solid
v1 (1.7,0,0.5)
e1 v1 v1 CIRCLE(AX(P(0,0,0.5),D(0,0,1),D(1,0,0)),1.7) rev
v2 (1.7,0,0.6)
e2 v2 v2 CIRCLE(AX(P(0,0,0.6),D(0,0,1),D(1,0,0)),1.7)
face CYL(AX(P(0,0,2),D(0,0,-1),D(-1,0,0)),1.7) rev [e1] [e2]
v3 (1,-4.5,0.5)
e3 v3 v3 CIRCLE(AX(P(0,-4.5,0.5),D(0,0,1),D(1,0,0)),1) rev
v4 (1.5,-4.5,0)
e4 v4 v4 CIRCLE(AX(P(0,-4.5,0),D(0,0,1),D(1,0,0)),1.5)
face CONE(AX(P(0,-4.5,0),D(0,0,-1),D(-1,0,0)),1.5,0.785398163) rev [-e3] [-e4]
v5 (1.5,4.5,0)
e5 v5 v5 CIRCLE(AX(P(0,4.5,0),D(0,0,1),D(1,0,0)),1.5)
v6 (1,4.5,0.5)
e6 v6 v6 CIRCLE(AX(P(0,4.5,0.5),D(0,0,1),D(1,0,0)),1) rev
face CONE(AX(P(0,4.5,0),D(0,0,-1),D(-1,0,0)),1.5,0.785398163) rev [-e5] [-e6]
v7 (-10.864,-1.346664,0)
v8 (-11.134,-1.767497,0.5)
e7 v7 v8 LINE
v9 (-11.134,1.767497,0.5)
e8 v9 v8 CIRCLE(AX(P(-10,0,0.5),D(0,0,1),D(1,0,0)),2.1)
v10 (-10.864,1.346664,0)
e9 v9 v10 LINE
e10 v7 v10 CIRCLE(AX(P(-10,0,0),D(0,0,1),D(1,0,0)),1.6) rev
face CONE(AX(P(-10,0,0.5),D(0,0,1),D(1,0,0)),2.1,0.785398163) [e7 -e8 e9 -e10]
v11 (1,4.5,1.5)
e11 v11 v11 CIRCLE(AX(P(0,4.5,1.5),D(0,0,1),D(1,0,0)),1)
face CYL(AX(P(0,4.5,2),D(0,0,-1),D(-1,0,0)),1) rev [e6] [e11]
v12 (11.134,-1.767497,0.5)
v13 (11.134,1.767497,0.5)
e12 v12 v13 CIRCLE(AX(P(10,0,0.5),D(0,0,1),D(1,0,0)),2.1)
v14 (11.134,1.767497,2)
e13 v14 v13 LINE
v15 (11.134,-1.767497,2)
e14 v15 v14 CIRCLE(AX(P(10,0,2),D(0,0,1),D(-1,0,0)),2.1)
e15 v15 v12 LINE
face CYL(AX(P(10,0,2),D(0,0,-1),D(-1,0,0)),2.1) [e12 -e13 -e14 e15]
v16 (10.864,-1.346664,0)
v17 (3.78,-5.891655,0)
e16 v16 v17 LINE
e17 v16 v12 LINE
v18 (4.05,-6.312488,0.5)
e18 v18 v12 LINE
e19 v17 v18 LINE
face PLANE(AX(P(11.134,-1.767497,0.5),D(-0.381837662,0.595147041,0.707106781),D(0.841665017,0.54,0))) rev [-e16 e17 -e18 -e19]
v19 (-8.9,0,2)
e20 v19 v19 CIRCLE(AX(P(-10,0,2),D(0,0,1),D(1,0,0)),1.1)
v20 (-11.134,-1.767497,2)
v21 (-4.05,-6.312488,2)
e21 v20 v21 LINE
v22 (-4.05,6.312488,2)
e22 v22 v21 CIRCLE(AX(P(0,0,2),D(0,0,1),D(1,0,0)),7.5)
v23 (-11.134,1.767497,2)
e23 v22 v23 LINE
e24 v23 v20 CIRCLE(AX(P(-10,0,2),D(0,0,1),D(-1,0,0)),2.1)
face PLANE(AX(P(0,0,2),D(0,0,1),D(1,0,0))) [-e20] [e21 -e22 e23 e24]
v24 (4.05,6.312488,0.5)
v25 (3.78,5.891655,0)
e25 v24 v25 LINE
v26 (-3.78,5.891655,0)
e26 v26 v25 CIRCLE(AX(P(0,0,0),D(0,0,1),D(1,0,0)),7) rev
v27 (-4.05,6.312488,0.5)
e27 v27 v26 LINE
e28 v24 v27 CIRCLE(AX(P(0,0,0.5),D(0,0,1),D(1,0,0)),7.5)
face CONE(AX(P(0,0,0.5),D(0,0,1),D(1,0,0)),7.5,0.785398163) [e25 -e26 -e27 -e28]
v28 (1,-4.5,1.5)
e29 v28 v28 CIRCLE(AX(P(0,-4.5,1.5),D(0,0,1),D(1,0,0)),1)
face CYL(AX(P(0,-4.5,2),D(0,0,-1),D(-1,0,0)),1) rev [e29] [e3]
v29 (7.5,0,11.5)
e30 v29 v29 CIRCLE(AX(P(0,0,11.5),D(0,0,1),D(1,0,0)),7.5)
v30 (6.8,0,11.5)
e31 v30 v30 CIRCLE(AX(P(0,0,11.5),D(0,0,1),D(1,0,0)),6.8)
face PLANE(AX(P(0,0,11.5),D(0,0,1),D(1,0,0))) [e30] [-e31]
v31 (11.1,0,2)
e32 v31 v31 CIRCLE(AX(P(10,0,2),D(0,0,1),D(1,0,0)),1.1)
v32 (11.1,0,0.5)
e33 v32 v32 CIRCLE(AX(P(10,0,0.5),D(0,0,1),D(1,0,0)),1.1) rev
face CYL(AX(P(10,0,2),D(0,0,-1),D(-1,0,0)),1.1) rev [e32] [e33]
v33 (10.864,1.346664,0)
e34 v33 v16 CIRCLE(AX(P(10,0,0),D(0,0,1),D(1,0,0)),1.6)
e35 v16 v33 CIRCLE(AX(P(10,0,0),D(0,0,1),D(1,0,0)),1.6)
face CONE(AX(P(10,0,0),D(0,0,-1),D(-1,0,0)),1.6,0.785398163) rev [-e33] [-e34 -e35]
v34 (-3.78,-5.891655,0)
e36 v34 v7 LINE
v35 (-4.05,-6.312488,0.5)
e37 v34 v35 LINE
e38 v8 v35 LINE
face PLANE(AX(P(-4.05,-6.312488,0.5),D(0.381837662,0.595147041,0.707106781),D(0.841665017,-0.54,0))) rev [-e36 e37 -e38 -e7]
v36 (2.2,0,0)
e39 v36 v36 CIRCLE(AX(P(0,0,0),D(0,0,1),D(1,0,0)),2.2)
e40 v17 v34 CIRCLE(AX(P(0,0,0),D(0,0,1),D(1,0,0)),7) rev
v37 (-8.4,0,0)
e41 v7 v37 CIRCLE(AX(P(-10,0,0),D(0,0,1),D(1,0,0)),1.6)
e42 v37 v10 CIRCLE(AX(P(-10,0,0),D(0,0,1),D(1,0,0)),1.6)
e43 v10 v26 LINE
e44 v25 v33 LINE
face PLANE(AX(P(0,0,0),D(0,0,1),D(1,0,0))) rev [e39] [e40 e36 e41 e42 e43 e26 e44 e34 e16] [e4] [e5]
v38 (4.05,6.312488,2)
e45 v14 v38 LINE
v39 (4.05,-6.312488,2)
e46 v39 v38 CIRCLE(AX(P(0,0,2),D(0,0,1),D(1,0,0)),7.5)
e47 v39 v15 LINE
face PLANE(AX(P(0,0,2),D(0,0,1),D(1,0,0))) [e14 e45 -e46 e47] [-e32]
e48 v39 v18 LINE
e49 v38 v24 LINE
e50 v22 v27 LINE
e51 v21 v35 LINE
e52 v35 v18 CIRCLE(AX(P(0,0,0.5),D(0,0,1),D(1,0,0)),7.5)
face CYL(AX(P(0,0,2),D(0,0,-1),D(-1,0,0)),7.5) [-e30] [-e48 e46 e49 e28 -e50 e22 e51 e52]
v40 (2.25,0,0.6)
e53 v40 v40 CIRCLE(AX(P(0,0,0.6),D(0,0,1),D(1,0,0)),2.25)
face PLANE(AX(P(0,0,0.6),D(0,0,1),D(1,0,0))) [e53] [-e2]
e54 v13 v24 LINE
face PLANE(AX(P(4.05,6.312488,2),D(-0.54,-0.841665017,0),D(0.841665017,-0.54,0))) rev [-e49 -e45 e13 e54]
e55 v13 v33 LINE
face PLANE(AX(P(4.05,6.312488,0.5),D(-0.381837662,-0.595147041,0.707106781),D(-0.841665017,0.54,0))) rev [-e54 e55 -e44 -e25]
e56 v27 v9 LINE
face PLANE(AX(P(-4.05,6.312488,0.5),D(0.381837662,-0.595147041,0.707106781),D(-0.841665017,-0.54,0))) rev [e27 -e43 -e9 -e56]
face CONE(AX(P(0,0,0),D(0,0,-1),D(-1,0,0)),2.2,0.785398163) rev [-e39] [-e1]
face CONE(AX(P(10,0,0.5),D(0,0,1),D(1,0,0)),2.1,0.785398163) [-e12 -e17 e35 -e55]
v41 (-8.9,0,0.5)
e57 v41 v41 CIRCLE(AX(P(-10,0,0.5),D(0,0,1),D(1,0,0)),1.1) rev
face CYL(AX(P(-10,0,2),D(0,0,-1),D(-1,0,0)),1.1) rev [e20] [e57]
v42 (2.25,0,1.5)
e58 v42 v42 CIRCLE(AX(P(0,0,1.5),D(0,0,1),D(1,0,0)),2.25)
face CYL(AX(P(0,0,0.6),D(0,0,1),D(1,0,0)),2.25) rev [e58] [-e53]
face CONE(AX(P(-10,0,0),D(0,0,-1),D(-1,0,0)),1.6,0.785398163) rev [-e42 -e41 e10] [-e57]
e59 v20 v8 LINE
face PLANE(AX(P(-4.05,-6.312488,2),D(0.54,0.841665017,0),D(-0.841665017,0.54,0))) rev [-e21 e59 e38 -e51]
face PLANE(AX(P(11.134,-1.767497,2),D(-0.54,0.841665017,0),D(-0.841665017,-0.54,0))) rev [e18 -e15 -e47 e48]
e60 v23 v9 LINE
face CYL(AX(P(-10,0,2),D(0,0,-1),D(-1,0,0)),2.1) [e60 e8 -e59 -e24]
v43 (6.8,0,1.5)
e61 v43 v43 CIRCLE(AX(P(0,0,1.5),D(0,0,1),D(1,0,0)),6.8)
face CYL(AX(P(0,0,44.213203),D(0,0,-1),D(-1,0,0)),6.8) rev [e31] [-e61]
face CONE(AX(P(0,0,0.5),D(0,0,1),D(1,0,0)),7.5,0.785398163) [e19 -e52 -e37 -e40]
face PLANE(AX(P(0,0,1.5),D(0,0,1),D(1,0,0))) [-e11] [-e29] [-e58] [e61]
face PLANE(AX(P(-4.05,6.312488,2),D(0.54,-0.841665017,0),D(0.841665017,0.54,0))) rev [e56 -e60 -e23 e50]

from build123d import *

# Parameters (mm, degrees)
SKETCH_2_R          = 1.1
SKETCH_2_R_2        = 1
SKETCH_2_R_3        = 1.7
EXTRUDE_1_DEPTH     = 2
SKETCH_3_R          = 7.5
SKETCH_3_R_2        = 6.8
EXTRUDE_1_2_DEPTH   = 9.5
CUT_EXTRUDE_START   = -0.5
SKETCH_4_R          = 6.8
CUT_EXTRUDE_1_DEPTH = 0.5
SKETCH_5_R          = 2.25
CUT_EXTRUDE_2_DEPTH = 0.9
CHAMFER_1_SIZE      = 0.5


with BuildPart() as part:
    # Эскиз2 → Extrude 1 (new body)
    with BuildSketch(Plane.XY):
        with BuildLine():
            Line((4.05, 6.312487624), (11.134, 1.767496535))
            ThreePointArc((11.134, 1.767496535), (12.1, 0), (11.134, -1.767496535))
            Line((11.134, -1.767496535), (4.05, -6.312487624))
            ThreePointArc((4.05, -6.312487624), (0, -7.5), (-4.05, -6.312487624))
            Line((-4.05, -6.312487624), (-11.134, -1.767496535))
            ThreePointArc((-11.134, -1.767496535), (-12.1, 0), (-11.134, 1.767496535))
            Line((-11.134, 1.767496535), (-4.05, 6.312487624))
            ThreePointArc((-4.05, 6.312487624), (0, 7.5), (4.05, 6.312487624))
        make_face()
        with Locations((10, 0)):
            Circle(SKETCH_2_R, mode=Mode.SUBTRACT)
        with Locations((-10, 0)):
            Circle(SKETCH_2_R, mode=Mode.SUBTRACT)
        with Locations((0, 4.5)):
            Circle(SKETCH_2_R_2, mode=Mode.SUBTRACT)
        with Locations(Location((0, -4.5, 0), (0, 0, 180))):
            Circle(SKETCH_2_R_2, mode=Mode.SUBTRACT)
        Circle(SKETCH_2_R_3, mode=Mode.SUBTRACT)
    extrude(amount=EXTRUDE_1_DEPTH)

    # Эскиз3 → Extrude 1 2 (add)
    with BuildSketch(Plane.XY.offset(2)):
        Circle(SKETCH_3_R)
        Circle(SKETCH_3_R_2, mode=Mode.SUBTRACT)
    extrude(amount=EXTRUDE_1_2_DEPTH)

    # Эскиз4 → Вырез-Вытянуть1 (cut)
    with BuildSketch(Plane.XY.offset(2).offset(CUT_EXTRUDE_START)):
        Circle(SKETCH_4_R)
    extrude(amount=CUT_EXTRUDE_1_DEPTH, mode=Mode.SUBTRACT)

    # Эскиз5 → Вырез-Вытянуть2 (cut)
    with BuildSketch(Plane.XY.offset(1.5)):
        Circle(SKETCH_5_R)
    extrude(amount=-CUT_EXTRUDE_2_DEPTH, mode=Mode.SUBTRACT)

    # Фаска1
    chamfer_1_edges = [part.edges().sort_by_distance(p)[0] for p in [
        (-7.592, 4.039992079, 0),
        (0, 7.5, 0),
        (8.9, 0, 0),
        (-1, 4.5, 0),
        (1, -4.5, 0),
        (-1.7, 0, 0),
        (-11.1, 0, 0),
        (7.592, 4.039992079, 0),
        (12.1, 0, 0),
        (7.592, -4.039992079, 0),
        (0, -7.5, 0),
        (-7.592, -4.039992079, 0),
        (-12.1, 0, 0),
    ]]
    chamfer(chamfer_1_edges, length=CHAMFER_1_SIZE - 0.0001)  # a hair under: the kernel refuses the full size


solid = part.part
